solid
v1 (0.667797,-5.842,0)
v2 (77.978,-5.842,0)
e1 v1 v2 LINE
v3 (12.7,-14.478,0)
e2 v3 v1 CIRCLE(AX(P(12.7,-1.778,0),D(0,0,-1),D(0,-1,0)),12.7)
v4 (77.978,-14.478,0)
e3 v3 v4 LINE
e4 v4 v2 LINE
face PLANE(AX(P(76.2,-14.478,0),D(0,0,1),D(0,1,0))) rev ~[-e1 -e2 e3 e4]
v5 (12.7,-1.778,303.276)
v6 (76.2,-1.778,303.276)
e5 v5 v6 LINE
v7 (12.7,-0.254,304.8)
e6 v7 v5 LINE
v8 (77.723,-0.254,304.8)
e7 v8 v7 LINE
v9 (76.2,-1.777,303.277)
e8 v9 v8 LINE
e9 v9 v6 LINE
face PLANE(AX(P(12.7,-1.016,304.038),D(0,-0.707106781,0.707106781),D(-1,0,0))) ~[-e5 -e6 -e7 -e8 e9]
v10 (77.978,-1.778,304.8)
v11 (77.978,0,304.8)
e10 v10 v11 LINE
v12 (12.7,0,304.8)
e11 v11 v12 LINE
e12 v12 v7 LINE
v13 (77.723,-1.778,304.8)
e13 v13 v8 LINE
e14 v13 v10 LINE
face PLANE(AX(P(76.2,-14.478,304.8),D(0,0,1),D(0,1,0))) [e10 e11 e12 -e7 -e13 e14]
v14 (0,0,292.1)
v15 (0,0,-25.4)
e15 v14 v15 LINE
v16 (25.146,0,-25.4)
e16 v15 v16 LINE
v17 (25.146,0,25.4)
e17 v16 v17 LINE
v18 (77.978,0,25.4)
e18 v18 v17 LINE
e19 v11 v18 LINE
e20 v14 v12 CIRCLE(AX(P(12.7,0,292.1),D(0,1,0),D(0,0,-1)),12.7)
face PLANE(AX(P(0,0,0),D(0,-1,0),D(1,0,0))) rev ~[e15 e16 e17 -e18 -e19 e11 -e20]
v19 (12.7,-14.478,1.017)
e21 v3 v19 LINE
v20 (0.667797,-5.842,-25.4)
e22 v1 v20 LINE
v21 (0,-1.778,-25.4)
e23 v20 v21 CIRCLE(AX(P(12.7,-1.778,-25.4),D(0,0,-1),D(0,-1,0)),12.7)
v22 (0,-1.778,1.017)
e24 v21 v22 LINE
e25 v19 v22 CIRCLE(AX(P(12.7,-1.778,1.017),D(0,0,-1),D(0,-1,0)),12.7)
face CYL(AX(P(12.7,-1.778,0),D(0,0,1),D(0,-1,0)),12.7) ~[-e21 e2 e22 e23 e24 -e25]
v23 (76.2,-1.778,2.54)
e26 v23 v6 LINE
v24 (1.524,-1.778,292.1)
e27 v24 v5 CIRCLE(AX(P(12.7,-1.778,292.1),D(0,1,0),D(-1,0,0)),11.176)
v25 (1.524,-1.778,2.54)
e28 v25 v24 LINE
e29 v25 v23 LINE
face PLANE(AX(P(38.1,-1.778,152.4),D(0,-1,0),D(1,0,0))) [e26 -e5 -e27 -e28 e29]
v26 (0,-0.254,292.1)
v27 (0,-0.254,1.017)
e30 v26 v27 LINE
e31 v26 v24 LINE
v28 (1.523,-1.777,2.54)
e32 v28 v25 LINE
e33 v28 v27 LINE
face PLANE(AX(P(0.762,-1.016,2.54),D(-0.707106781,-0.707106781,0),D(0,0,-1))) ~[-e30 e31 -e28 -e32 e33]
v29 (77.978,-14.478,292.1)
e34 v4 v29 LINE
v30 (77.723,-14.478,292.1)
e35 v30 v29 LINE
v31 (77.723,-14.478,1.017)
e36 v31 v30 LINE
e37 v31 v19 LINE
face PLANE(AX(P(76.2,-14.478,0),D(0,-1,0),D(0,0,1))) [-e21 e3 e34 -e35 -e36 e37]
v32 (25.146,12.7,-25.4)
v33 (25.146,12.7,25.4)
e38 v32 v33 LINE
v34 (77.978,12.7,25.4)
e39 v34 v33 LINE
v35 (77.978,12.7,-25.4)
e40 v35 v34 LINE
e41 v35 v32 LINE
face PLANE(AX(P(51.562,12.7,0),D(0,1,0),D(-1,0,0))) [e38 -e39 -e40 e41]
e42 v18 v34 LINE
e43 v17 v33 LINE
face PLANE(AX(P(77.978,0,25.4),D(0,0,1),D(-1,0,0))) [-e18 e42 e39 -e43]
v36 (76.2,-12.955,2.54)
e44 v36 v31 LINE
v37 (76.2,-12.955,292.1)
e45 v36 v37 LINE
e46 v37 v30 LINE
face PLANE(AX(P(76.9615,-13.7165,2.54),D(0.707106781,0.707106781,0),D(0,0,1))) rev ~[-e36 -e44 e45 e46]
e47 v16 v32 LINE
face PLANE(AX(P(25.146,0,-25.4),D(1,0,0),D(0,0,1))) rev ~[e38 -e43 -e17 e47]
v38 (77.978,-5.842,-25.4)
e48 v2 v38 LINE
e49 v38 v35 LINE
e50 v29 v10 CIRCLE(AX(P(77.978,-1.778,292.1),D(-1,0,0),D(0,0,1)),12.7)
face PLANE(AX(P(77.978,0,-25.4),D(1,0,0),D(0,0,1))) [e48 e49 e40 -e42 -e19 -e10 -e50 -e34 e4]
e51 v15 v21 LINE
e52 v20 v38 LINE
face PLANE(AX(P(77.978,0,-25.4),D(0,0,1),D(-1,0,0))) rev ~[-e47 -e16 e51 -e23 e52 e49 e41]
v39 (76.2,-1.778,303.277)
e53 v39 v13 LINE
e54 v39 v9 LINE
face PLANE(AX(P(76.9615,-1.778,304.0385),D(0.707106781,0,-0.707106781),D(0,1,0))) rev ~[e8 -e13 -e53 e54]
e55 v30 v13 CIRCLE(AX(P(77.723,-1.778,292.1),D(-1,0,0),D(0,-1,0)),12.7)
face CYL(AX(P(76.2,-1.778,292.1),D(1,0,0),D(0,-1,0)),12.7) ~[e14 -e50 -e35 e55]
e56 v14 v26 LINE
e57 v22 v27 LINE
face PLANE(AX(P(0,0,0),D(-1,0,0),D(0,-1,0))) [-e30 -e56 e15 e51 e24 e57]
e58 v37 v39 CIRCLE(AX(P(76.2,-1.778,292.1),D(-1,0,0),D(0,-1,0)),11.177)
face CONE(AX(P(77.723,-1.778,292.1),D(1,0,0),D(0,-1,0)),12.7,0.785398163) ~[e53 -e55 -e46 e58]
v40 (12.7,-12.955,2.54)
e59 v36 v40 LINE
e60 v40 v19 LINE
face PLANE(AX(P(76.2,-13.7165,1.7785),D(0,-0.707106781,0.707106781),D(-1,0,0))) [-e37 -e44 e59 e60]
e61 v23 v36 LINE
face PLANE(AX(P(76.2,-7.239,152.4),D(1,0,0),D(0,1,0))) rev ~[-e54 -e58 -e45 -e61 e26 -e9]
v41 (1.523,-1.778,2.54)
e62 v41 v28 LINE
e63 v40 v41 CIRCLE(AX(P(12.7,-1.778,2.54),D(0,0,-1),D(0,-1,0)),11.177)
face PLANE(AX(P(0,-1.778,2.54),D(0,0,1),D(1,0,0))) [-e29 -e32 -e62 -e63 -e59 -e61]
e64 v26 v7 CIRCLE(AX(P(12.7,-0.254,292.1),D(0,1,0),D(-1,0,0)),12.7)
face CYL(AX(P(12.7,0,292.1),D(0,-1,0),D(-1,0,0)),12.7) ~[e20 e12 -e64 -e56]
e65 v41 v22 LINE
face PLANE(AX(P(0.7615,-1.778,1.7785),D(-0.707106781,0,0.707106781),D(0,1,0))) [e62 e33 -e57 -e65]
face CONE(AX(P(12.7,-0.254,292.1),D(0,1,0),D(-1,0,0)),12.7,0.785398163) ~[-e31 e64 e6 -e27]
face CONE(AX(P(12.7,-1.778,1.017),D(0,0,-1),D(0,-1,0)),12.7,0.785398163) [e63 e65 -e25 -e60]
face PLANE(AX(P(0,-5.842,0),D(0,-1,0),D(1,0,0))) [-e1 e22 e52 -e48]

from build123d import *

# Parameters (mm, degrees)
F0_W      = 76.2
F0_H      = 304.8
F1_DEPTH  = 1.778
F2_W      = 76.2
F2_H      = 2.54
F3_DEPTH  = 12.7
F4_W      = 14.478
F4_H      = 304.8
F5_DEPTH  = 1.778
F4_W_2    = 0.1264255261
F4_H_2    = 0.0905882334
F6_W      = 77.978
F6_H      = 5.842
F7_DEPTH  = 25.4
F8_W      = 52.324
F8_H      = 50.8
F9_DEPTH  = 10.16
F11_W     = 52.832
F11_H     = 50.8
F12_DEPTH = 12.7
F13_R     = 12.7
F14_R     = 12.7
F15_R     = 12.7
F16_SIZE  = 1.524
F17_SIZE  = 1.523


# Not quite as in the source:
# - a fillet or chamfer is up to 0.001 mm smaller than in the source, because OpenCascade refuses the exact size


with BuildPart() as f1:
    # F0 (on Front) → F1 (new body)
    with BuildSketch(Plane.XZ):
        with Locations((38.1, 152.4)):
            Rectangle(F0_W, F0_H)
    extrude(amount=F1_DEPTH)

    # F2 (on face) → F3 (join)
    with BuildSketch(Plane.XZ.offset(1.778)):
        with Locations((38.1, 1.27)):
            Rectangle(F2_W, F2_H)
    extrude(amount=F3_DEPTH)

    # F4 (on face) → F5 (join)
    with BuildSketch(Plane.YZ.offset(76.2)):
        with Locations((-7.239, 152.4)):
            Rectangle(F4_W, F4_H)
    extrude(amount=F5_DEPTH)

    # F6 (on face) → F7 (join)
    with BuildSketch(Plane(origin=(0, 0, 0), x_dir=(1, 0, 0), z_dir=(0, 0, -1))):
        with Locations((38.989, 2.921)):
            Rectangle(F6_W, F6_H)
    extrude(amount=F7_DEPTH)

    # F11 (on face) → F12 (join)
    with BuildSketch(Plane(origin=(0, 0, 0), x_dir=(-1, 0, 0), z_dir=(0, 1, 0))):
        with Locations((-51.562, 0)):
            Rectangle(F11_W, F11_H)
    extrude(amount=F12_DEPTH)

    # F13
    f13_edges = [f1.edges().sort_by_distance(p)[0] for p in [
        (0, -0.889, 304.8),
    ]]
    fillet(f13_edges, radius=F13_R)

    # F14
    f14_edges = [f1.edges().sort_by_distance(p)[0] for p in [
        (77.089, -14.478, 304.8),
    ]]
    fillet(f14_edges, radius=F14_R)

    # F15
    f15_edges = [f1.edges().sort_by_distance(p)[0] for p in [
        (0, -14.478, 1.27),
    ]]
    fillet(f15_edges, radius=F15_R)

    # F16
    f16_edges = [f1.edges().sort_by_distance(p)[0] for p in [
        (0, -1.778, 147.32),
    ]]
    chamfer(f16_edges, length=F16_SIZE)

    # F17 (size 1.524 in the source; OpenCascade refuses exactly that, so slightly less here)
    f17_edges = [f1.edges().sort_by_distance(p)[0] for p in [
        (3.719744, -10.758256, 2.54),
        (44.45, -14.478, 2.54),
        (76.2, -14.478, 147.32),
    ]]
    chamfer(f17_edges, length=F17_SIZE)


with BuildPart() as f5:
    # F4 (on face) → F5, piece 2 (new body)
    with BuildSketch(Plane.YZ.offset(76.2)):
        with Locations((1.1594051612, 0.5721470225)):
            Rectangle(F4_W_2, F4_H_2)
    extrude(amount=F5_DEPTH)


with BuildPart() as f9:
    # F8 (on face) → F9 (new body)
    with BuildSketch(Plane(origin=(0, 0, 0), x_dir=(-1, 0, 0), z_dir=(0, 1, 0))):
        with Locations((-51.816, 0)):
            Rectangle(F8_W, F8_H)
    extrude(amount=F9_DEPTH)


solid = f1.part
